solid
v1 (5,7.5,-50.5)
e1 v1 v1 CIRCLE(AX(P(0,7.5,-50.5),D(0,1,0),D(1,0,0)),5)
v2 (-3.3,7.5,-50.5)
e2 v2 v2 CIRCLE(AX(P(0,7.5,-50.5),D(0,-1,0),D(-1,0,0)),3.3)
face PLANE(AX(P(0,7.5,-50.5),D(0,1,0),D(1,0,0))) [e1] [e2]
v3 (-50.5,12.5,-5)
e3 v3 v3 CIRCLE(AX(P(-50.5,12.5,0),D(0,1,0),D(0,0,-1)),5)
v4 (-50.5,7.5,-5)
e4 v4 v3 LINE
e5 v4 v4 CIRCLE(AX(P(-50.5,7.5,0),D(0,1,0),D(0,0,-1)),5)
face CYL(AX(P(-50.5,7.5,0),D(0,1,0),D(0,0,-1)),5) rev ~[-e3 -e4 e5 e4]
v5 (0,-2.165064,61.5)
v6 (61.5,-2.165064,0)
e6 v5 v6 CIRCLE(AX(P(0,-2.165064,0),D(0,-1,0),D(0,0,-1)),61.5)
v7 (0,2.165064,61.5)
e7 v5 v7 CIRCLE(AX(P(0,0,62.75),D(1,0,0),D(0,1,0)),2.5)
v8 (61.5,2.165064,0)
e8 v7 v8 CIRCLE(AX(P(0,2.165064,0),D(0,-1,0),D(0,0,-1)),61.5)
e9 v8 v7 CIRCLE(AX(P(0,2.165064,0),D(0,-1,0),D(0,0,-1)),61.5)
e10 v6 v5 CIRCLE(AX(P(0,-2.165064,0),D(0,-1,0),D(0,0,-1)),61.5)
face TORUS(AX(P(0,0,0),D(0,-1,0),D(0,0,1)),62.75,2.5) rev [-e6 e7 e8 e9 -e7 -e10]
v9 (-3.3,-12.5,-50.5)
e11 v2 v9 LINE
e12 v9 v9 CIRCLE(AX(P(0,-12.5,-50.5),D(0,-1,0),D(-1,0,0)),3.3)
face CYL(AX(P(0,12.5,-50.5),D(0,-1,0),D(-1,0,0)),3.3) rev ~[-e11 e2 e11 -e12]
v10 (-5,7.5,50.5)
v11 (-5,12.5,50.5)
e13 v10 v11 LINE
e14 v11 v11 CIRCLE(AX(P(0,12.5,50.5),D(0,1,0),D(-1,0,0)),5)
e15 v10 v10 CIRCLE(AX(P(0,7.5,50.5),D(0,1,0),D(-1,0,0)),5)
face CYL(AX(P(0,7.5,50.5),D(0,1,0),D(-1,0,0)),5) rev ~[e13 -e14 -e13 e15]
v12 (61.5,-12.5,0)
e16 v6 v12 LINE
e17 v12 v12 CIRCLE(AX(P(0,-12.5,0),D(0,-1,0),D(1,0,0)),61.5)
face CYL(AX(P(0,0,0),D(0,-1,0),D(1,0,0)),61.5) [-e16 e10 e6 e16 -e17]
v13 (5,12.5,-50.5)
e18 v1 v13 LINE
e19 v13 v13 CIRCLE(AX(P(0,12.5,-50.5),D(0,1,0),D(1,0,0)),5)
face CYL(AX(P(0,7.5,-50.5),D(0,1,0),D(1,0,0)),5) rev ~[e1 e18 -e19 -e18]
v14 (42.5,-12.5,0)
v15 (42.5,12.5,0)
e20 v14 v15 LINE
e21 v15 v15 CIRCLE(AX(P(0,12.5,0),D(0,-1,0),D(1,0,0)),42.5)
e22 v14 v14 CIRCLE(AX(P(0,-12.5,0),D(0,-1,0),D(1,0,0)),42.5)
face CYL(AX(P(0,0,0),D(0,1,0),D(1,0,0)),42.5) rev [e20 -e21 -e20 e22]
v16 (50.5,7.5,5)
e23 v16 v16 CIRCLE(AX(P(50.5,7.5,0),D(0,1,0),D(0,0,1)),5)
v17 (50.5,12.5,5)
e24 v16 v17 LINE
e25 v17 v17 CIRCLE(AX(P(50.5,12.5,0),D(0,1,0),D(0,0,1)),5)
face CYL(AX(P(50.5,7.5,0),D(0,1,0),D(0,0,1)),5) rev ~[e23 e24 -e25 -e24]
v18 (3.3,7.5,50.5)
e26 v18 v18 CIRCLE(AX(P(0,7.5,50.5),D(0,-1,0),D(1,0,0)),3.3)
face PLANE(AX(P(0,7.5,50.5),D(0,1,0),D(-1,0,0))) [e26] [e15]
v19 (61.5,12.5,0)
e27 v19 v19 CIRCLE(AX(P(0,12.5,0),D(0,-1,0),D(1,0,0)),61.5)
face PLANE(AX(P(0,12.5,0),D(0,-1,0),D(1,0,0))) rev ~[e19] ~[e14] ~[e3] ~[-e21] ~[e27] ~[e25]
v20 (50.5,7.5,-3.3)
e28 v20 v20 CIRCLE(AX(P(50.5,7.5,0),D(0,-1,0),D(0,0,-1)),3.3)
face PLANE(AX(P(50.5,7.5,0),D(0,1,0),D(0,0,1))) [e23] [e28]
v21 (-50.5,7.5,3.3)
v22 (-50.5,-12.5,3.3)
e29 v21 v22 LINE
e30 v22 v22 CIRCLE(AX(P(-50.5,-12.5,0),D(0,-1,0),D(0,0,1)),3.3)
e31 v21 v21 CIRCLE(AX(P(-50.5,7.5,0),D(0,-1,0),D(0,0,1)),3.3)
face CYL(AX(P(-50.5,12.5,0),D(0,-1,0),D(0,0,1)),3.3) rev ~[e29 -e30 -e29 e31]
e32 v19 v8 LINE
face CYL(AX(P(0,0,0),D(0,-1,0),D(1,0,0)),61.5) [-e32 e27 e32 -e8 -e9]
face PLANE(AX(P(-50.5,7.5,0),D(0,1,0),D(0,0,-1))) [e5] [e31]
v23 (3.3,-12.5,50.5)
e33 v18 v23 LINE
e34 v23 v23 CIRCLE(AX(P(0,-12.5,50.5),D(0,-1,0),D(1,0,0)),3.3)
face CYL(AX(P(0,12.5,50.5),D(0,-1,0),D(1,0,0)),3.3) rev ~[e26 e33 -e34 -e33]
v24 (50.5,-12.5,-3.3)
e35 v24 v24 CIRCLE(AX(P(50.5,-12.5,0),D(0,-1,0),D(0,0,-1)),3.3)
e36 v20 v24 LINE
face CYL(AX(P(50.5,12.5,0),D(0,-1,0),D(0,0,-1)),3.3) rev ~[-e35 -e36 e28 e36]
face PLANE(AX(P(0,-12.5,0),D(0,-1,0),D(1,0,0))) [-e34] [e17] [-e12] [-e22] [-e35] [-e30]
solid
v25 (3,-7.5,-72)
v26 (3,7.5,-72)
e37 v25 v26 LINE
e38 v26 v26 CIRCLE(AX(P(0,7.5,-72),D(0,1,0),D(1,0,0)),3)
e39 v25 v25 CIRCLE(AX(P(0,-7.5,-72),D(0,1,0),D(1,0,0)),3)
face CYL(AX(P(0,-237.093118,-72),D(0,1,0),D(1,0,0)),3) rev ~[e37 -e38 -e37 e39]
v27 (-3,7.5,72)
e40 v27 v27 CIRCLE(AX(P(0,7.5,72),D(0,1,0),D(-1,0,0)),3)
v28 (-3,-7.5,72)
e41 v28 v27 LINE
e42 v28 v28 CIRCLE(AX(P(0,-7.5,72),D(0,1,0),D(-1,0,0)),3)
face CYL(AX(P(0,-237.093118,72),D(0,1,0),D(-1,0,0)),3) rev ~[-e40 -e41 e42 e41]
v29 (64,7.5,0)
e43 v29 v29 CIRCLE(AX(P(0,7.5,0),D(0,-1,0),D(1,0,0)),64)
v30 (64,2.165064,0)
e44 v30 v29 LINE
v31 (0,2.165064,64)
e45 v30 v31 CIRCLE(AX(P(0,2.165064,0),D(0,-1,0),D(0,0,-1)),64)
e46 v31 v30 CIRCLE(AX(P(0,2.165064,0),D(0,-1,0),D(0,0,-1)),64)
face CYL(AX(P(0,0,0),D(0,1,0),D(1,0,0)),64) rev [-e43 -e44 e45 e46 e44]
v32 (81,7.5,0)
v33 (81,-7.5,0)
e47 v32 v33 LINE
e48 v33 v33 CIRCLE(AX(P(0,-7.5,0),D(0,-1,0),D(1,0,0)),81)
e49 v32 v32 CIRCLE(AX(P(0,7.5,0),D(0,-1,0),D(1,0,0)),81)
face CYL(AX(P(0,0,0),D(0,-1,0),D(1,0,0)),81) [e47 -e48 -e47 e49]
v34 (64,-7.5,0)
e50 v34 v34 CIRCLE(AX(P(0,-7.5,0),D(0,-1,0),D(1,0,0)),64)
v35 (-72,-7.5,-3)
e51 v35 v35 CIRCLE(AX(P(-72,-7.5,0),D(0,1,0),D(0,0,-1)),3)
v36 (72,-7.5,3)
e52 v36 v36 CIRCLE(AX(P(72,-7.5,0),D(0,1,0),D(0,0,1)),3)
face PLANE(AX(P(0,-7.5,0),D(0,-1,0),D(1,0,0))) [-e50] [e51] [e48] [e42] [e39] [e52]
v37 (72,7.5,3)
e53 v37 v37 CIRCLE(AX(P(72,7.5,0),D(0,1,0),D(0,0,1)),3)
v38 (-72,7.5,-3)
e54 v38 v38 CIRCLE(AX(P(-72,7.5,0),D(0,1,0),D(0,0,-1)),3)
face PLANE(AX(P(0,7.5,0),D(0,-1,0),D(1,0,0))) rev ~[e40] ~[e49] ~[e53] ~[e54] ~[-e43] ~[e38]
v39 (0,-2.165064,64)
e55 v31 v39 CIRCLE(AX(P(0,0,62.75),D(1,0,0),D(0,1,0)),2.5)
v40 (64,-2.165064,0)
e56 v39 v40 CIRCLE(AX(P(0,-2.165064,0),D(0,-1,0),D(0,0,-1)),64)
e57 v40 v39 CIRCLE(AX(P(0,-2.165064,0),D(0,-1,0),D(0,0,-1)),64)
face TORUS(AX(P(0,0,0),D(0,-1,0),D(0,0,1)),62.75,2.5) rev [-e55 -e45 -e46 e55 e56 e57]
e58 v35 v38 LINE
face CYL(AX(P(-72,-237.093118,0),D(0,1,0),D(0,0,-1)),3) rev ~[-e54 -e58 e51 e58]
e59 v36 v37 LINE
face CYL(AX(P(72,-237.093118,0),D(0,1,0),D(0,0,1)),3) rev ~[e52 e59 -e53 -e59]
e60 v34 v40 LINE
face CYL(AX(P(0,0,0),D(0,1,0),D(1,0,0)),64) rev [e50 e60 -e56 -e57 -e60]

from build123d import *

# Parameters (mm, degrees)
F0_R            = 81
F0_R_2          = 64
F1_DEPTH        = 7.5
F2_R            = 61.5
F2_R_2          = 42.5
F3_DEPTH        = 12.5
F4_R            = 2.5
F8_D            = 6.6
F8_CBORE_D      = 10
F8_CBORE_DEPTH  = 5
F8_COPIES_COUNT = 4
F9_D            = 6
F9_COPIES_COUNT = 4


# Not quite as in the source:
# - a pattern or mirror of a feature is missing from the dataset's text; its kind, count and spacing are read off the source's solid


with BuildPart() as f1:
    # F0 (on Front) → F1 (new body, symmetric)
    with BuildSketch(Plane.XZ):
        Circle(F0_R)
        Circle(F0_R_2, mode=Mode.SUBTRACT)
    extrude(amount=F1_DEPTH, both=True)


with BuildPart() as f3:
    # F2 (on Front) → F3 (new body, symmetric)
    with BuildSketch(Plane.XZ):
        Circle(F2_R)
        Circle(F2_R_2, mode=Mode.SUBTRACT)
    extrude(amount=F3_DEPTH, both=True)


with BuildPart() as f5_tool:
    # F4 (on Right) → F5 (revolve)
    with BuildSketch(Plane.YZ):
        with Locations((0, 62.75)):
            Circle(F4_R)
    revolve(axis=Axis((0, 0, 0), (0, 1, 0)))


with BuildPart() as f1_1:
    add(f1.part)

    # F5: cut by f5_tool
    add(f5_tool.part, mode=Mode.SUBTRACT)

    # F9 (through all)
    with Locations(Plane.XZ.offset(7.5)):
        with Locations((0, 72)):
            f9 = Hole(F9_D / 2)

    # F9_copies: F9 ×4 about axis
    f9_copies_axis = Axis((0, 0, 0), (0, 1, 0))
    for i in range(1, F9_COPIES_COUNT):
        add(f9.rotate(f9_copies_axis, i * 360 / F9_COPIES_COUNT), mode=Mode.SUBTRACT)


with BuildPart() as f3_1:
    add(f3.part)

    # F5: cut by f5_tool
    add(f5_tool.part, mode=Mode.SUBTRACT)

    # F8 (through all)
    with Locations(Plane(origin=(0, 12.5, 0), x_dir=(-1, 0, 0), z_dir=(0, 1, 0))):
        with Locations((0, 50.5)):
            f8 = CounterBoreHole(F8_D / 2, F8_CBORE_D / 2, F8_CBORE_DEPTH)

    # F8_copies: F8 ×4 about axis
    f8_copies_axis = Axis((0, 0, 0), (0, 1, 0))
    for i in range(1, F8_COPIES_COUNT):
        add(f8.rotate(f8_copies_axis, i * 360 / F8_COPIES_COUNT), mode=Mode.SUBTRACT)


solid = Compound([f1_1.part, f3_1.part])
